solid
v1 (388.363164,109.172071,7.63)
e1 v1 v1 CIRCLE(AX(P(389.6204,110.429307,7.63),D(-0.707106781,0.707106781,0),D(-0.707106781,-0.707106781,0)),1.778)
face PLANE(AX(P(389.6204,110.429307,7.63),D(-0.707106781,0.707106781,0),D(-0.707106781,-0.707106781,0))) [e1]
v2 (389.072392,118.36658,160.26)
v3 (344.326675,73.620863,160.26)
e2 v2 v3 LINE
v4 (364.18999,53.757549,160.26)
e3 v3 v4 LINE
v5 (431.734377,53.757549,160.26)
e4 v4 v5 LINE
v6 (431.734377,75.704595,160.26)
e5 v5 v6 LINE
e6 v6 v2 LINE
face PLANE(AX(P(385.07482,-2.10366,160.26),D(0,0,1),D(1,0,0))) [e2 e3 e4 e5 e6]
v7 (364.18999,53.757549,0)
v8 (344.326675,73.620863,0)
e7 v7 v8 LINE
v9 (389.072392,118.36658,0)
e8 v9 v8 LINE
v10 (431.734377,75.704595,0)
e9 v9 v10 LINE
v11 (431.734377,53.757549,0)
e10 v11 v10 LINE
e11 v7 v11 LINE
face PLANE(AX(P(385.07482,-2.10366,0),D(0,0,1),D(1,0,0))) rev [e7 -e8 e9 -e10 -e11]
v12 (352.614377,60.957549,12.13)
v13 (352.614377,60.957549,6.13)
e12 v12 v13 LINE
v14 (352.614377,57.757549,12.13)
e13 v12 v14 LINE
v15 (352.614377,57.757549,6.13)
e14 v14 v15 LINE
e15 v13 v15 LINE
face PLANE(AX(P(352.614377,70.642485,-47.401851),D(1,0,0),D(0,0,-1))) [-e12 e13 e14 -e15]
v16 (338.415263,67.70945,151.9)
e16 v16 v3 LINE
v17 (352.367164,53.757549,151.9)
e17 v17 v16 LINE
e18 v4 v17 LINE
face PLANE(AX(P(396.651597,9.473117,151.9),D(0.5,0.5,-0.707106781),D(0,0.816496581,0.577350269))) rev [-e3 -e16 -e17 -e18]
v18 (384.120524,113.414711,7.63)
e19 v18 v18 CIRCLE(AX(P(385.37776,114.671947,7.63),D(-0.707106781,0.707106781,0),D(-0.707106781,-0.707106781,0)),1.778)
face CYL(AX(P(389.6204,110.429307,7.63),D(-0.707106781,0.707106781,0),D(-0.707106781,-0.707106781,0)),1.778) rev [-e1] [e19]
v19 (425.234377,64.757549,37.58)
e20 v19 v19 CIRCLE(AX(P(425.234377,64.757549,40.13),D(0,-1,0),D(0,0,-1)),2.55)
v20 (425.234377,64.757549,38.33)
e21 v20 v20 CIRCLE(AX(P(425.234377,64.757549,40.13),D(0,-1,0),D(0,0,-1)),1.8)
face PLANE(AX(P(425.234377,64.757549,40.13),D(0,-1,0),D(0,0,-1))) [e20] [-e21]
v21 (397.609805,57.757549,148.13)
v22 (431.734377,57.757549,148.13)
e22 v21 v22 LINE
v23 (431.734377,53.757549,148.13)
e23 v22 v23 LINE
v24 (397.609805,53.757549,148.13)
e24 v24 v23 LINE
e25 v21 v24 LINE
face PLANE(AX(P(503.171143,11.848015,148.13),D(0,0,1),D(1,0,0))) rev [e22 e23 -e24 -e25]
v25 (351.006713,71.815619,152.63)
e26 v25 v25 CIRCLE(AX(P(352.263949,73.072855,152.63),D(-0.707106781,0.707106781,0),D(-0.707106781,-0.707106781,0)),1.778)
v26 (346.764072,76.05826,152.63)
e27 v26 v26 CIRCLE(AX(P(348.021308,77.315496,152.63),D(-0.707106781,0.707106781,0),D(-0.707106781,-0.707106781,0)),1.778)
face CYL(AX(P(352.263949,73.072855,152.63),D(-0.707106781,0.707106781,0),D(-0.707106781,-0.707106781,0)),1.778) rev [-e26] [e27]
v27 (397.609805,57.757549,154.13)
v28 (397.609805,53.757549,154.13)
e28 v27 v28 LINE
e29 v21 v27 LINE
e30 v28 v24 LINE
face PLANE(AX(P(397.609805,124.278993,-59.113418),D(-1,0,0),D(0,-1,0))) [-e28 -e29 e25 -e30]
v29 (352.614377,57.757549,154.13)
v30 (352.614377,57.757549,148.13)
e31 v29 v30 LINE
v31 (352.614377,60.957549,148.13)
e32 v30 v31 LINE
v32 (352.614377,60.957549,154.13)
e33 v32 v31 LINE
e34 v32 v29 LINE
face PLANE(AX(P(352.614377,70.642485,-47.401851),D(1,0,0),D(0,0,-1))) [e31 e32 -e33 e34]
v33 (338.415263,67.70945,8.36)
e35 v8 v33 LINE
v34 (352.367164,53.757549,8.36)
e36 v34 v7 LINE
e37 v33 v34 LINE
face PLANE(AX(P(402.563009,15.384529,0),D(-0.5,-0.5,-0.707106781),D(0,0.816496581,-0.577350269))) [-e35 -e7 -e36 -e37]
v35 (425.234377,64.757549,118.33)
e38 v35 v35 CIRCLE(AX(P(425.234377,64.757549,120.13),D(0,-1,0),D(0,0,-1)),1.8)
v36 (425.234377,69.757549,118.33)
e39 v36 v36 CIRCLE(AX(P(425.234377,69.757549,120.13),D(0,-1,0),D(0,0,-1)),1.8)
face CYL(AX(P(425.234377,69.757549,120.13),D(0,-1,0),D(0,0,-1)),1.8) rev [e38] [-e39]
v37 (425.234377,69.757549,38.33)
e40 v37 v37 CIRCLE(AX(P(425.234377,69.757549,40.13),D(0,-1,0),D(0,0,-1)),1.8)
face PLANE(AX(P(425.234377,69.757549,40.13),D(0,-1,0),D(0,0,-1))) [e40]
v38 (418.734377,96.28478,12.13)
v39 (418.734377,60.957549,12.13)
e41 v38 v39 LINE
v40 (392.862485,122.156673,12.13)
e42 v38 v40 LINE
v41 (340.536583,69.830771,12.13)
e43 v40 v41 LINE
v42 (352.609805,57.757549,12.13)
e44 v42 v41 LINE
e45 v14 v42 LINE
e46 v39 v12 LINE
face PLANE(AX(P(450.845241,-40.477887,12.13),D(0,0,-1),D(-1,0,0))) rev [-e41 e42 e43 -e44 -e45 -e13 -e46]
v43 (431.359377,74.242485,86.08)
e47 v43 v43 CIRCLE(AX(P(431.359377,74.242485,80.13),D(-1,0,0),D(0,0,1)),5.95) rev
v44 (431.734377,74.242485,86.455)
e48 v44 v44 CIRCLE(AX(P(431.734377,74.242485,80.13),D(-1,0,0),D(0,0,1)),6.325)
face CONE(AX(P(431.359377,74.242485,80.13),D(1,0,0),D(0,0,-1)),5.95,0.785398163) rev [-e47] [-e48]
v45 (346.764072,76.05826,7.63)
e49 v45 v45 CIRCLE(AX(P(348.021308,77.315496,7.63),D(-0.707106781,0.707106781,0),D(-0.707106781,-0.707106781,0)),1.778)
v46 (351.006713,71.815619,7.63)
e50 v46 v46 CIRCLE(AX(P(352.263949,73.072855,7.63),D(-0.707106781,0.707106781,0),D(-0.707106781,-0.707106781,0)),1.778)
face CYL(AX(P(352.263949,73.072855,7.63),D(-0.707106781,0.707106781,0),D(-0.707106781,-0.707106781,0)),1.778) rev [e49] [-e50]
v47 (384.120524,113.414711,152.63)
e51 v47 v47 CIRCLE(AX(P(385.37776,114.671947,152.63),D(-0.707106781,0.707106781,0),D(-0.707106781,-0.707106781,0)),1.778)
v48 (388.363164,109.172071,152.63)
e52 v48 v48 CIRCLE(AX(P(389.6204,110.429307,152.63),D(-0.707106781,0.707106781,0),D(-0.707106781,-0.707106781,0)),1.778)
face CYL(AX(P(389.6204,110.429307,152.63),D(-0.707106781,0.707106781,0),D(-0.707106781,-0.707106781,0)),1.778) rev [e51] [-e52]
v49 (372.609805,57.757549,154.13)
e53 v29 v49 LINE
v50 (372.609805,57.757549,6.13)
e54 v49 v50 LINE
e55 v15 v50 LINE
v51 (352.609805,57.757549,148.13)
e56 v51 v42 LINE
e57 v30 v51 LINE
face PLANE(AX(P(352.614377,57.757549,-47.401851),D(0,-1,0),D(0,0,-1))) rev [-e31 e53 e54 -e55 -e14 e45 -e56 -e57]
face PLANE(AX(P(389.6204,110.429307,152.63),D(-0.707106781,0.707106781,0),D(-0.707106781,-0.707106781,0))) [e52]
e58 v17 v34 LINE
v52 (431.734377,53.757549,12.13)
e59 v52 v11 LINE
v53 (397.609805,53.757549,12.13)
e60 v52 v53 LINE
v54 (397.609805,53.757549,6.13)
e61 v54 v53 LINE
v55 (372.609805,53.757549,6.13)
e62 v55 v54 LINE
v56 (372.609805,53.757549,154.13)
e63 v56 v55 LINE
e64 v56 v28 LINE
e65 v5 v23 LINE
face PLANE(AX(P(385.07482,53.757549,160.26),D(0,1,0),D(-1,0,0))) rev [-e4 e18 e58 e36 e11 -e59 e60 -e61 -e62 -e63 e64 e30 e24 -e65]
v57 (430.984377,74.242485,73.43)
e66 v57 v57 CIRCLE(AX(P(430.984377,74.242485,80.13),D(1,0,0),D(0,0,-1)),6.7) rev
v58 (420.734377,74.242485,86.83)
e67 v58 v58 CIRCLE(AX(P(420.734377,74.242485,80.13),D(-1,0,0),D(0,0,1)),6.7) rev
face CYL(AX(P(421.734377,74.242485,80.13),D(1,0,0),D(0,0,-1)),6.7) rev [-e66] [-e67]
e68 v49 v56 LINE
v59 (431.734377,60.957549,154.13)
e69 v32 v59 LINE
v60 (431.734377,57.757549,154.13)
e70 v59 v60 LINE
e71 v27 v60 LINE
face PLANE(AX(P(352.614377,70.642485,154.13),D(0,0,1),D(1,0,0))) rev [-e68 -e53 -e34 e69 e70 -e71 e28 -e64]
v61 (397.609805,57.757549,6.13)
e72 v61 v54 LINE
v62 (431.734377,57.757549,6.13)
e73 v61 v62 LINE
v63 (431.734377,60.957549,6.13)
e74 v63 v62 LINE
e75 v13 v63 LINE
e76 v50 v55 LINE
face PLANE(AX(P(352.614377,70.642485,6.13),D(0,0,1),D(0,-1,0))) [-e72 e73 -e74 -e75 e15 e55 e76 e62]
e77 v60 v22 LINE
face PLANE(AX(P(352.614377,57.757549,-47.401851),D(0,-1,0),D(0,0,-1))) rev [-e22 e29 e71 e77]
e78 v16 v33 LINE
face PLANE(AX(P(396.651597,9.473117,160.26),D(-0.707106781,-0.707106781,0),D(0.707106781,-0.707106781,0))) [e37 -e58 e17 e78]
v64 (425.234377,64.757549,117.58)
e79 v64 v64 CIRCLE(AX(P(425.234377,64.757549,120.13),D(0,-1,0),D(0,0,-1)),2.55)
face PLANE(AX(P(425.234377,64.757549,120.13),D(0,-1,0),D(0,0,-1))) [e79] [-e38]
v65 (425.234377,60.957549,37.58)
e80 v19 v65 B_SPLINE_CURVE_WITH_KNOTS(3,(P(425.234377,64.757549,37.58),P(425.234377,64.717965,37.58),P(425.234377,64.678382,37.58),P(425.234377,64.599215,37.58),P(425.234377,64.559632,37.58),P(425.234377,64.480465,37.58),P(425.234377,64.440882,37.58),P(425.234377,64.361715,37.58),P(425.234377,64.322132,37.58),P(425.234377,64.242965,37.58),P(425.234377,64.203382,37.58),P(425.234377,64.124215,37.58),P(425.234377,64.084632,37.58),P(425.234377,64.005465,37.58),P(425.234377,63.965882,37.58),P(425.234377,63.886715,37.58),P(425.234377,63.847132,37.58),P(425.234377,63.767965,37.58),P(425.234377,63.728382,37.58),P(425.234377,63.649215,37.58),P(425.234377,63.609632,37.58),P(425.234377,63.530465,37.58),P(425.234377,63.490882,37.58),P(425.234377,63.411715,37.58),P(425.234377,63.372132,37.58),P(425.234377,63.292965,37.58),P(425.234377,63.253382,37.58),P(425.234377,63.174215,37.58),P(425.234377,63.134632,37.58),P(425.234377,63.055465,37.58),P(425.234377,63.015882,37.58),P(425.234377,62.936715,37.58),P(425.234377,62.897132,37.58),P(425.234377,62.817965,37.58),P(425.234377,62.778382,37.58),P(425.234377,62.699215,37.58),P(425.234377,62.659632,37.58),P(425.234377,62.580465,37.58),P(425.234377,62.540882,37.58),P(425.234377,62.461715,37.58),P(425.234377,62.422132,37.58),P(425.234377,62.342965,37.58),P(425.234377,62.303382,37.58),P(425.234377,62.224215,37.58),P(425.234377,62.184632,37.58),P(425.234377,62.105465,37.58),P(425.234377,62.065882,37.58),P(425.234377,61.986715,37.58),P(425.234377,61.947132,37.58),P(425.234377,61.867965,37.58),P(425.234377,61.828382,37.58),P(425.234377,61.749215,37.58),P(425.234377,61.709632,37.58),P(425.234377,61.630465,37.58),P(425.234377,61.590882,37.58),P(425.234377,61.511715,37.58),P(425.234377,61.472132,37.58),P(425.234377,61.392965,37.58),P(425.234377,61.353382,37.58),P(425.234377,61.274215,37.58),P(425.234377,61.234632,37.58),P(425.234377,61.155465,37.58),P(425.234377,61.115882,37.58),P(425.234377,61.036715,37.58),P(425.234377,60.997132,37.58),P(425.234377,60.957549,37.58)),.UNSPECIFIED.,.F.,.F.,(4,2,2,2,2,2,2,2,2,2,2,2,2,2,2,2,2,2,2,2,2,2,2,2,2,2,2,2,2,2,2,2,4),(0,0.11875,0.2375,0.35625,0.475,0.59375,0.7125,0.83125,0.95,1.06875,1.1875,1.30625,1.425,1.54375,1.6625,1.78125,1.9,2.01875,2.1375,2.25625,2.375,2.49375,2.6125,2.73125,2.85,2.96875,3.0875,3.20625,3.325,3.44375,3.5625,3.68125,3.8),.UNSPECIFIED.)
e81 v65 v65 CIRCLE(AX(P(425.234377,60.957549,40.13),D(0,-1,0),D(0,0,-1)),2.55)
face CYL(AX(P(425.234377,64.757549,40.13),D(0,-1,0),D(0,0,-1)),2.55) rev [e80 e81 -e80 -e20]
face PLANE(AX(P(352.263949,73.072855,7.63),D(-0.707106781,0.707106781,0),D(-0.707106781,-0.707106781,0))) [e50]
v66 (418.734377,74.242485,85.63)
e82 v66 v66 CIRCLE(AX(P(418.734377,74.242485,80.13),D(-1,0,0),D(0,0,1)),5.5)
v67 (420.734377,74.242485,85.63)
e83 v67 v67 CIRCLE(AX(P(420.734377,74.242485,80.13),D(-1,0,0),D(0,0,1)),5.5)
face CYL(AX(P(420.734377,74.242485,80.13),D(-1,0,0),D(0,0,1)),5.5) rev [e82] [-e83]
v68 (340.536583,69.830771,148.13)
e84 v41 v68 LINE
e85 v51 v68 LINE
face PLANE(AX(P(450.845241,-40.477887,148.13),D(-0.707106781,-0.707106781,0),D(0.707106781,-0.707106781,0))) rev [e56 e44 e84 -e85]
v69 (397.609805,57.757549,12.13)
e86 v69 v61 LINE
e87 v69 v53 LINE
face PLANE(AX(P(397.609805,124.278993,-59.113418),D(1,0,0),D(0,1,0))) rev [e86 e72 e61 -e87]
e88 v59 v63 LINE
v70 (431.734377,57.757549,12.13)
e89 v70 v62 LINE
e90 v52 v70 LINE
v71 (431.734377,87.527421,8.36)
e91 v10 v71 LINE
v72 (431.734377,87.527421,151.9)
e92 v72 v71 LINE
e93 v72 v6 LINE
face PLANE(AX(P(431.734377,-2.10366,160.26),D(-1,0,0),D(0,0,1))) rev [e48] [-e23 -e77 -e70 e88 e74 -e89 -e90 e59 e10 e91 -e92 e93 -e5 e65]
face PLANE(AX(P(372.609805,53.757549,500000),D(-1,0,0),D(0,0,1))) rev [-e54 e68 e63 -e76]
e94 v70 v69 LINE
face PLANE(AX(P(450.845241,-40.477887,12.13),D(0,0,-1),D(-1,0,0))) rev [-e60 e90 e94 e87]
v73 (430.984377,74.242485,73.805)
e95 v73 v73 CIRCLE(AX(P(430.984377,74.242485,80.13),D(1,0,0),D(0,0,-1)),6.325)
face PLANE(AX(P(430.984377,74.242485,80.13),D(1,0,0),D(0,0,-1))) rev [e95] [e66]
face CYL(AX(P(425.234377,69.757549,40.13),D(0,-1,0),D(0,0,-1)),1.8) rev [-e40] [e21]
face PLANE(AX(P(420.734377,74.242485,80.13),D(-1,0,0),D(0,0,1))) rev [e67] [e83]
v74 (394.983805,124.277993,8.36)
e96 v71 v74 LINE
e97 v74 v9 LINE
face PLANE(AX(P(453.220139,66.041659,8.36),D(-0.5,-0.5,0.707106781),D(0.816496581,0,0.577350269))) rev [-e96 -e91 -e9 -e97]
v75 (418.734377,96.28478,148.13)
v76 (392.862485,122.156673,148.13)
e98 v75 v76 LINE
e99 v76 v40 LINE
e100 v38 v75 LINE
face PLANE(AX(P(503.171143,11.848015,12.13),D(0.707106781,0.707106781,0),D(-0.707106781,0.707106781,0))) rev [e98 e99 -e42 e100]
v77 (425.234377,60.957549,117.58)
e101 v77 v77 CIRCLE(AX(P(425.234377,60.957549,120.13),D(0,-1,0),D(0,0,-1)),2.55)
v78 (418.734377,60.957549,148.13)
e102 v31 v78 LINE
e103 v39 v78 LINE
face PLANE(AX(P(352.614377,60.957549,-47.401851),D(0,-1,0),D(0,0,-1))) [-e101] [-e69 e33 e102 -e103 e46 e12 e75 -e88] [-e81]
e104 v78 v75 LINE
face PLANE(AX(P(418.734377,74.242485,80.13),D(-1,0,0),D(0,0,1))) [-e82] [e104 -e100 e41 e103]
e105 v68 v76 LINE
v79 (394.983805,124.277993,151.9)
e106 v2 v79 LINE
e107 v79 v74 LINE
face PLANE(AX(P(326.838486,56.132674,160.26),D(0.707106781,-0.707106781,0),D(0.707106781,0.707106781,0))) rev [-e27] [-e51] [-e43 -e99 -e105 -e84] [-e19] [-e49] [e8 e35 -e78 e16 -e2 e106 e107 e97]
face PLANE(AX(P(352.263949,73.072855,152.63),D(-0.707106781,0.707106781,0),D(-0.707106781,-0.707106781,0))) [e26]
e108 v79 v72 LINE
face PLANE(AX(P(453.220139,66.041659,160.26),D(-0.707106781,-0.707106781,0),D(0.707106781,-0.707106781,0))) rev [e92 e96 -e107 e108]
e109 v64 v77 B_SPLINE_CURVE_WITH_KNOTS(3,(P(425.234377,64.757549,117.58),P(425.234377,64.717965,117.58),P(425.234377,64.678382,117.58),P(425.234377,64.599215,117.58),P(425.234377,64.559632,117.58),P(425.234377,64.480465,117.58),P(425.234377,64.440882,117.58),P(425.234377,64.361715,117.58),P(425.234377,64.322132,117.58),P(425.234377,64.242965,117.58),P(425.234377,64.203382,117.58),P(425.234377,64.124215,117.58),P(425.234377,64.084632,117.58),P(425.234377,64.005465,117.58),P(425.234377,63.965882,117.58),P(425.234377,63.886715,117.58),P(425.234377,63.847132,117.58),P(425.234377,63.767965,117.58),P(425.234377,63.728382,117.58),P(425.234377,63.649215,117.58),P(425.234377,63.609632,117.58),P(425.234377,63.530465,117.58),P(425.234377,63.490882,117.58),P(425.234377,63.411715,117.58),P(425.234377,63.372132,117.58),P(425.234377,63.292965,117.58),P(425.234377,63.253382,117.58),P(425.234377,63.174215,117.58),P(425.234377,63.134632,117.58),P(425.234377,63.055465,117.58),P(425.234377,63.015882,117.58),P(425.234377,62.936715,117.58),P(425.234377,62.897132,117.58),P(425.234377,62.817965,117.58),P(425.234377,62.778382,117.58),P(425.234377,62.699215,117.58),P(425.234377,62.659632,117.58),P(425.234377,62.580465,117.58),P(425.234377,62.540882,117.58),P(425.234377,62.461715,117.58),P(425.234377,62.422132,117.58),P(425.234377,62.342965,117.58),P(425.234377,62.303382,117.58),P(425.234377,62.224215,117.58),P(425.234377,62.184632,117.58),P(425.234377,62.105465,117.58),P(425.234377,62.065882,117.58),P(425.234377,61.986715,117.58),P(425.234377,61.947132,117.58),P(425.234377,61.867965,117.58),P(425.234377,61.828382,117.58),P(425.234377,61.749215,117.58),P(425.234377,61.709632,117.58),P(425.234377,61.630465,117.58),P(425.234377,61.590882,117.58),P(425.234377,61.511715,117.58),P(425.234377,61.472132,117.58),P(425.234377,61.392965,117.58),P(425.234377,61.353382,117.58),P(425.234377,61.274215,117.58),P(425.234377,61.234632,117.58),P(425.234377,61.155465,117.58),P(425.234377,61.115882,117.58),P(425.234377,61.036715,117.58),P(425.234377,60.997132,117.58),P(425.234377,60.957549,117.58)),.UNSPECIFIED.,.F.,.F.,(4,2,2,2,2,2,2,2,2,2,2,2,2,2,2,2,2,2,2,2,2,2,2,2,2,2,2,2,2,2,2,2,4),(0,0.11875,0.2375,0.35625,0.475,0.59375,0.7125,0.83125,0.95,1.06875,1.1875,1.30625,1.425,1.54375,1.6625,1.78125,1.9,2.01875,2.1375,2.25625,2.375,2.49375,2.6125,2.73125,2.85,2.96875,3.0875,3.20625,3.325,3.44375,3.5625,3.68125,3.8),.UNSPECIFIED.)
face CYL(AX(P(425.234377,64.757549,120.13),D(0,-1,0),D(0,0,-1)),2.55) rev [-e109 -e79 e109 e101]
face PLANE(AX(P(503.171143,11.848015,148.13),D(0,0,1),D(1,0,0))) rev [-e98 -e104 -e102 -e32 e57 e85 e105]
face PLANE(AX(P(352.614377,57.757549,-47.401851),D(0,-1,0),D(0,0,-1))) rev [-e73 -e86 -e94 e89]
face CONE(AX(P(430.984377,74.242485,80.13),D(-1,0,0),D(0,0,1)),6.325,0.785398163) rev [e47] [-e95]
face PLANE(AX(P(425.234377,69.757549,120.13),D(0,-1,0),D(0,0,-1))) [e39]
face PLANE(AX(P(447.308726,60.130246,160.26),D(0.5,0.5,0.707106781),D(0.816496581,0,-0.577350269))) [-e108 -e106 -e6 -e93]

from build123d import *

# Parameters (mm, degrees)
BOSS_EXTRUDE1_DEPTH  = 160.26
SKETCH2_OUTSIDE_W    = 201.942
SKETCH2_OUTSIDE_H    = 157.534
SKETCH2_OUTSIDE_W_2  = 160.26
SKETCH2_OUTSIDE_H_2  = 80
SKETCH2_OUTSIDE_W_3  = 136
SKETCH2_OUTSIDE_H_3  = 74
CUT_EXTRUDE1_DEPTH   = 156
SKETCH11_R           = 1.778
CUT_EXTRUDE8_DEPTH   = 6
BOSS_EXTRUDE14_REACH = 475.056
SKETCH19_W           = 148
SKETCH19_H           = 3.2
CUT_EXTRUDE13_DEPTH  = 79.12
SKETCH24_W           = 136
SKETCH24_H           = 4
CUT_EXTRUDE15_DEPTH  = 3
BOSS_EXTRUDE16_REACH = 475.056
CHAMFER2_SIZE        = 8.36
CUT_EXTRUDE19_REACH  = 467.887
SKETCH31_W           = 25
SKETCH31_H           = 6
SKETCH32_R           = 6.7
CUT_EXTRUDE20_DEPTH  = 10
SKETCH33_R           = 9.2
SKETCH33_R_2         = 6.7
BOSS_EXTRUDE17_DEPTH = 10
SKETCH34_R           = 9
SKETCH34_R_2         = 5.5
BOSS_EXTRUDE18_DEPTH = 2
SKETCH35_R           = 6.7
SKETCH35_R_2         = 5.95
BOSS_EXTRUDE19_DEPTH = 0.75
CHAMFER4_SIZE        = 0.375
SKETCH36_W           = 136
SKETCH36_H           = 25.327231326
SKETCH36_R           = 9.2
BOSS_EXTRUDE20_DEPTH = 10
BOSS_EXTRUDE21_DEPTH = 136
SKETCH38_R           = 2.55
CUT_EXTRUDE23_DEPTH  = 3.8
SKETCH39_R           = 1.8
CUT_EXTRUDE24_DEPTH  = 5


with BuildPart() as part:
    # Sketch1 → Boss-Extrude1 (new body)
    with BuildSketch(Plane.XY):
        Polygon((352.367164448, 53.75754858), (431.734377425, 53.75754858), (431.734377425, 87.527420593), (394.983805142, 124.277992876), (338.415262647, 67.709450381), align=None)
    extrude(amount=BOSS_EXTRUDE1_DEPTH)

    # Sketch2 outside → Cut-Extrude1 (cut)
    # profile 1 of 2: a face of its own
    with BuildSketch(Plane(origin=(135.352906133, -135.352906133, 0), x_dir=(0, 0, 1), z_dir=(-0.7071067811865476, 0.7071067811865476, 0))):
        with Locations((80.13, 335.234)):
            Rectangle(SKETCH2_OUTSIDE_W, SKETCH2_OUTSIDE_H)
        with Locations((80.13, 327.17353859)):
            Rectangle(SKETCH2_OUTSIDE_W_2, SKETCH2_OUTSIDE_H_2, mode=Mode.SUBTRACT)
    # profile 2 of 2: a face of its own
    with BuildSketch(Plane(origin=(135.352906133, -135.352906133, 0), x_dir=(0, 0, 1), z_dir=(-0.7071067811865476, 0.7071067811865476, 0))):
        with Locations((80.13, 327.17353859)):
            Rectangle(SKETCH2_OUTSIDE_W_3, SKETCH2_OUTSIDE_H_3)
    extrude(amount=-CUT_EXTRUDE1_DEPTH, mode=Mode.SUBTRACT)

    # Sketch11 → Cut-Extrude8 (cut)
    with BuildSketch(Plane(origin=(135.352906133, -135.352906133, 0), x_dir=(0, 0, 1), z_dir=(-0.7071067811865476, 0.7071067811865476, 0))):
        with Locations(Location((7.63, 353.58853859, 0), (0, 0, 270))):
            Circle(SKETCH11_R)
        with Locations(Location((7.63, 300.75853859, 0), (0, 0, 270))):
            Circle(SKETCH11_R)
        with Locations(Location((152.63, 353.58853859, 0), (0, 0, 270))):
            Circle(SKETCH11_R)
        with Locations(Location((152.63, 300.75853859, 0), (0, 0, 270))):
            Circle(SKETCH11_R)
    extrude(amount=-CUT_EXTRUDE8_DEPTH, mode=Mode.SUBTRACT)

    # Sketch17 → Boss-Extrude14 (add, up to next)
    with BuildSketch(Plane.XY.offset(12.13), mode=Mode.PRIVATE) as boss_extrude14_sk1:
        Polygon((431.734377425, 83.284779906), (431.734377425, 53.75754858), (428.734377425, 53.75754858), (428.734377425, 86.284779906), align=None)
    boss_extrude14_tool1 = extrude(boss_extrude14_sk1.sketch, amount=BOSS_EXTRUDE14_REACH, mode=Mode.PRIVATE) - part.part
    add(boss_extrude14_tool1.solids().sort_by_distance((430.210205, 69.28325, 12.13))[0])

    # Sketch19 → Cut-Extrude13 (cut)
    with BuildSketch(Plane(origin=(431.734377425, 0, 0), x_dir=(0, 0, -1), z_dir=(1, 0, 0))):
        with Locations((-80.13, 59.35754858)):
            Rectangle(SKETCH19_W, SKETCH19_H)
    extrude(amount=-CUT_EXTRUDE13_DEPTH, mode=Mode.SUBTRACT)

    # Sketch24 → Cut-Extrude15 (cut)
    with BuildSketch(Plane(origin=(431.734377425, 0, 0), x_dir=(0, 0, -1), z_dir=(1, 0, 0))):
        with Locations((-80.13, 55.75754858)):
            Rectangle(SKETCH24_W, SKETCH24_H)
    extrude(amount=-CUT_EXTRUDE15_DEPTH, mode=Mode.SUBTRACT)

    # Sketch29 → Boss-Extrude16 (add, up to next)
    with BuildSketch(Plane.XY.offset(12.13), mode=Mode.PRIVATE) as boss_extrude16_sk1:
        Polygon((356.609805135, 53.75754858), (372.609805135, 53.75754858), (372.609805135, 57.75754858), (352.609805135, 57.75754858), align=None)
    boss_extrude16_tool1 = extrude(boss_extrude16_sk1.sketch, amount=BOSS_EXTRUDE16_REACH, mode=Mode.PRIVATE) - part.part
    add(boss_extrude16_tool1.solids().sort_by_distance((363.572768, 55.831623, 12.13))[0])

    # Chamfer2
    chamfer2_edges = [part.edges().sort_by_distance(p)[0] for p in [
        (413.359091284, 105.902706735, 160.26),
        (345.391213548, 60.733499481, 160.26),
        (345.391213548, 60.733499481, 0),
        (413.359091284, 105.902706735, 0),
    ]]
    chamfer(chamfer2_edges, length=CHAMFER2_SIZE)

    # Sketch31 → Cut-Extrude19 (cut, up to next)
    with BuildSketch(Plane.XZ.offset(-53.75754858), mode=Mode.PRIVATE) as cut_extrude19_sk1:
        with Locations((385.109805135, 151.13)):
            Rectangle(SKETCH31_W, SKETCH31_H)
    cut_extrude19_tool1 = extrude(cut_extrude19_sk1.sketch, amount=-CUT_EXTRUDE19_REACH, mode=Mode.PRIVATE) & part.part
    # Sketch31 → Cut-Extrude19 (cut, up to next)
    with BuildSketch(Plane.XZ.offset(-53.75754858), mode=Mode.PRIVATE) as cut_extrude19_sk2:
        with Locations((385.109805135, 9.13)):
            Rectangle(SKETCH31_W, SKETCH31_H)
    cut_extrude19_tool2 = extrude(cut_extrude19_sk2.sketch, amount=-CUT_EXTRUDE19_REACH, mode=Mode.PRIVATE) & part.part
    add(cut_extrude19_tool1.solids().sort_by_distance((385.109805, 53.757549, 151.13))[0], mode=Mode.SUBTRACT)
    add(cut_extrude19_tool2.solids().sort_by_distance((385.109805, 53.757549, 9.13))[0], mode=Mode.SUBTRACT)

    # Sketch32 → Cut-Extrude20 (cut)
    with BuildSketch(Plane(origin=(431.734377425, 0, 0), x_dir=(0, 0, -1), z_dir=(1, 0, 0))):
        with Locations((-80.13, 74.242484587)):
            Circle(SKETCH32_R)
    extrude(amount=-CUT_EXTRUDE20_DEPTH, mode=Mode.SUBTRACT)

    # Sketch33 → Boss-Extrude17 (add)
    with BuildSketch(Plane.ZY.offset(-428.734377425)):
        with Locations(Location((80.13, 74.242484587, 0), (0, 0, 180))):
            Circle(SKETCH33_R)
        with Locations(Location((80.13, 74.242484587, 0), (0, 0, 180))):
            Circle(SKETCH33_R_2, mode=Mode.SUBTRACT)
    extrude(amount=BOSS_EXTRUDE17_DEPTH)

    # Sketch34 → Boss-Extrude18 (add)
    with BuildSketch(Plane.ZY.offset(-418.734377425)):
        with Locations((80.13, 74.242484587)):
            Circle(SKETCH34_R)
        with Locations((80.13, 74.242484587)):
            Circle(SKETCH34_R_2, mode=Mode.SUBTRACT)
    extrude(amount=-BOSS_EXTRUDE18_DEPTH)

    # Sketch35 → Boss-Extrude19 (add)
    with BuildSketch(Plane(origin=(431.734377425, 0, 0), x_dir=(0, 0, -1), z_dir=(1, 0, 0))):
        with Locations((-80.13, 74.242484587)):
            Circle(SKETCH35_R)
        with Locations((-80.13, 74.242484587)):
            Circle(SKETCH35_R_2, mode=Mode.SUBTRACT)
    extrude(amount=-BOSS_EXTRUDE19_DEPTH)

    # Chamfer4
    chamfer4_edges = [part.edges().sort_by_distance(p)[0] for p in [
        (430.984377425, 74.242484587, 86.08),
        (431.734377425, 74.242484587, 86.08),
    ]]
    chamfer(chamfer4_edges, length=CHAMFER4_SIZE - 0.0001)  # a hair under: the kernel refuses the full size

    # Sketch36 → Boss-Extrude20 (add)
    with BuildSketch(Plane.ZY.offset(-428.734377425)):
        with Locations((80.13, 73.621164243)):
            Rectangle(SKETCH36_W, SKETCH36_H)
        with Locations((80.13, 74.242484587)):
            Circle(SKETCH36_R, mode=Mode.SUBTRACT)
    extrude(amount=BOSS_EXTRUDE20_DEPTH)

    # Sketch37 → Boss-Extrude21 (add)
    with BuildSketch(Plane(origin=(0, 0, 148.13), x_dir=(-1, 0, 0), z_dir=(0, 0, -1))):
        Polygon((-418.734377425, 86.284779906), (-418.734377425, 96.284779906), (-428.734377425, 86.284779906), align=None)
    extrude(amount=BOSS_EXTRUDE21_DEPTH)

    # Sketch38 → Cut-Extrude23 (cut)
    with BuildSketch(Plane.XZ.offset(-60.95754858)):
        with Locations(Location((425.234377425, 120.13, 0), (0, 0, 270))):
            Circle(SKETCH38_R)
        with Locations(Location((425.234377425, 40.13, 0), (0, 0, 270))):
            Circle(SKETCH38_R)
    extrude(amount=-CUT_EXTRUDE23_DEPTH, mode=Mode.SUBTRACT)

    # Sketch39 → Cut-Extrude24 (cut)
    with BuildSketch(Plane.XZ.offset(-64.75754858)):
        with Locations(Location((425.234377425, 120.13, 0), (0, 0, 270))):
            Circle(SKETCH39_R)
        with Locations(Location((425.234377425, 40.13, 0), (0, 0, 270))):
            Circle(SKETCH39_R)
    extrude(amount=-CUT_EXTRUDE24_DEPTH, mode=Mode.SUBTRACT)


solid = part.part
